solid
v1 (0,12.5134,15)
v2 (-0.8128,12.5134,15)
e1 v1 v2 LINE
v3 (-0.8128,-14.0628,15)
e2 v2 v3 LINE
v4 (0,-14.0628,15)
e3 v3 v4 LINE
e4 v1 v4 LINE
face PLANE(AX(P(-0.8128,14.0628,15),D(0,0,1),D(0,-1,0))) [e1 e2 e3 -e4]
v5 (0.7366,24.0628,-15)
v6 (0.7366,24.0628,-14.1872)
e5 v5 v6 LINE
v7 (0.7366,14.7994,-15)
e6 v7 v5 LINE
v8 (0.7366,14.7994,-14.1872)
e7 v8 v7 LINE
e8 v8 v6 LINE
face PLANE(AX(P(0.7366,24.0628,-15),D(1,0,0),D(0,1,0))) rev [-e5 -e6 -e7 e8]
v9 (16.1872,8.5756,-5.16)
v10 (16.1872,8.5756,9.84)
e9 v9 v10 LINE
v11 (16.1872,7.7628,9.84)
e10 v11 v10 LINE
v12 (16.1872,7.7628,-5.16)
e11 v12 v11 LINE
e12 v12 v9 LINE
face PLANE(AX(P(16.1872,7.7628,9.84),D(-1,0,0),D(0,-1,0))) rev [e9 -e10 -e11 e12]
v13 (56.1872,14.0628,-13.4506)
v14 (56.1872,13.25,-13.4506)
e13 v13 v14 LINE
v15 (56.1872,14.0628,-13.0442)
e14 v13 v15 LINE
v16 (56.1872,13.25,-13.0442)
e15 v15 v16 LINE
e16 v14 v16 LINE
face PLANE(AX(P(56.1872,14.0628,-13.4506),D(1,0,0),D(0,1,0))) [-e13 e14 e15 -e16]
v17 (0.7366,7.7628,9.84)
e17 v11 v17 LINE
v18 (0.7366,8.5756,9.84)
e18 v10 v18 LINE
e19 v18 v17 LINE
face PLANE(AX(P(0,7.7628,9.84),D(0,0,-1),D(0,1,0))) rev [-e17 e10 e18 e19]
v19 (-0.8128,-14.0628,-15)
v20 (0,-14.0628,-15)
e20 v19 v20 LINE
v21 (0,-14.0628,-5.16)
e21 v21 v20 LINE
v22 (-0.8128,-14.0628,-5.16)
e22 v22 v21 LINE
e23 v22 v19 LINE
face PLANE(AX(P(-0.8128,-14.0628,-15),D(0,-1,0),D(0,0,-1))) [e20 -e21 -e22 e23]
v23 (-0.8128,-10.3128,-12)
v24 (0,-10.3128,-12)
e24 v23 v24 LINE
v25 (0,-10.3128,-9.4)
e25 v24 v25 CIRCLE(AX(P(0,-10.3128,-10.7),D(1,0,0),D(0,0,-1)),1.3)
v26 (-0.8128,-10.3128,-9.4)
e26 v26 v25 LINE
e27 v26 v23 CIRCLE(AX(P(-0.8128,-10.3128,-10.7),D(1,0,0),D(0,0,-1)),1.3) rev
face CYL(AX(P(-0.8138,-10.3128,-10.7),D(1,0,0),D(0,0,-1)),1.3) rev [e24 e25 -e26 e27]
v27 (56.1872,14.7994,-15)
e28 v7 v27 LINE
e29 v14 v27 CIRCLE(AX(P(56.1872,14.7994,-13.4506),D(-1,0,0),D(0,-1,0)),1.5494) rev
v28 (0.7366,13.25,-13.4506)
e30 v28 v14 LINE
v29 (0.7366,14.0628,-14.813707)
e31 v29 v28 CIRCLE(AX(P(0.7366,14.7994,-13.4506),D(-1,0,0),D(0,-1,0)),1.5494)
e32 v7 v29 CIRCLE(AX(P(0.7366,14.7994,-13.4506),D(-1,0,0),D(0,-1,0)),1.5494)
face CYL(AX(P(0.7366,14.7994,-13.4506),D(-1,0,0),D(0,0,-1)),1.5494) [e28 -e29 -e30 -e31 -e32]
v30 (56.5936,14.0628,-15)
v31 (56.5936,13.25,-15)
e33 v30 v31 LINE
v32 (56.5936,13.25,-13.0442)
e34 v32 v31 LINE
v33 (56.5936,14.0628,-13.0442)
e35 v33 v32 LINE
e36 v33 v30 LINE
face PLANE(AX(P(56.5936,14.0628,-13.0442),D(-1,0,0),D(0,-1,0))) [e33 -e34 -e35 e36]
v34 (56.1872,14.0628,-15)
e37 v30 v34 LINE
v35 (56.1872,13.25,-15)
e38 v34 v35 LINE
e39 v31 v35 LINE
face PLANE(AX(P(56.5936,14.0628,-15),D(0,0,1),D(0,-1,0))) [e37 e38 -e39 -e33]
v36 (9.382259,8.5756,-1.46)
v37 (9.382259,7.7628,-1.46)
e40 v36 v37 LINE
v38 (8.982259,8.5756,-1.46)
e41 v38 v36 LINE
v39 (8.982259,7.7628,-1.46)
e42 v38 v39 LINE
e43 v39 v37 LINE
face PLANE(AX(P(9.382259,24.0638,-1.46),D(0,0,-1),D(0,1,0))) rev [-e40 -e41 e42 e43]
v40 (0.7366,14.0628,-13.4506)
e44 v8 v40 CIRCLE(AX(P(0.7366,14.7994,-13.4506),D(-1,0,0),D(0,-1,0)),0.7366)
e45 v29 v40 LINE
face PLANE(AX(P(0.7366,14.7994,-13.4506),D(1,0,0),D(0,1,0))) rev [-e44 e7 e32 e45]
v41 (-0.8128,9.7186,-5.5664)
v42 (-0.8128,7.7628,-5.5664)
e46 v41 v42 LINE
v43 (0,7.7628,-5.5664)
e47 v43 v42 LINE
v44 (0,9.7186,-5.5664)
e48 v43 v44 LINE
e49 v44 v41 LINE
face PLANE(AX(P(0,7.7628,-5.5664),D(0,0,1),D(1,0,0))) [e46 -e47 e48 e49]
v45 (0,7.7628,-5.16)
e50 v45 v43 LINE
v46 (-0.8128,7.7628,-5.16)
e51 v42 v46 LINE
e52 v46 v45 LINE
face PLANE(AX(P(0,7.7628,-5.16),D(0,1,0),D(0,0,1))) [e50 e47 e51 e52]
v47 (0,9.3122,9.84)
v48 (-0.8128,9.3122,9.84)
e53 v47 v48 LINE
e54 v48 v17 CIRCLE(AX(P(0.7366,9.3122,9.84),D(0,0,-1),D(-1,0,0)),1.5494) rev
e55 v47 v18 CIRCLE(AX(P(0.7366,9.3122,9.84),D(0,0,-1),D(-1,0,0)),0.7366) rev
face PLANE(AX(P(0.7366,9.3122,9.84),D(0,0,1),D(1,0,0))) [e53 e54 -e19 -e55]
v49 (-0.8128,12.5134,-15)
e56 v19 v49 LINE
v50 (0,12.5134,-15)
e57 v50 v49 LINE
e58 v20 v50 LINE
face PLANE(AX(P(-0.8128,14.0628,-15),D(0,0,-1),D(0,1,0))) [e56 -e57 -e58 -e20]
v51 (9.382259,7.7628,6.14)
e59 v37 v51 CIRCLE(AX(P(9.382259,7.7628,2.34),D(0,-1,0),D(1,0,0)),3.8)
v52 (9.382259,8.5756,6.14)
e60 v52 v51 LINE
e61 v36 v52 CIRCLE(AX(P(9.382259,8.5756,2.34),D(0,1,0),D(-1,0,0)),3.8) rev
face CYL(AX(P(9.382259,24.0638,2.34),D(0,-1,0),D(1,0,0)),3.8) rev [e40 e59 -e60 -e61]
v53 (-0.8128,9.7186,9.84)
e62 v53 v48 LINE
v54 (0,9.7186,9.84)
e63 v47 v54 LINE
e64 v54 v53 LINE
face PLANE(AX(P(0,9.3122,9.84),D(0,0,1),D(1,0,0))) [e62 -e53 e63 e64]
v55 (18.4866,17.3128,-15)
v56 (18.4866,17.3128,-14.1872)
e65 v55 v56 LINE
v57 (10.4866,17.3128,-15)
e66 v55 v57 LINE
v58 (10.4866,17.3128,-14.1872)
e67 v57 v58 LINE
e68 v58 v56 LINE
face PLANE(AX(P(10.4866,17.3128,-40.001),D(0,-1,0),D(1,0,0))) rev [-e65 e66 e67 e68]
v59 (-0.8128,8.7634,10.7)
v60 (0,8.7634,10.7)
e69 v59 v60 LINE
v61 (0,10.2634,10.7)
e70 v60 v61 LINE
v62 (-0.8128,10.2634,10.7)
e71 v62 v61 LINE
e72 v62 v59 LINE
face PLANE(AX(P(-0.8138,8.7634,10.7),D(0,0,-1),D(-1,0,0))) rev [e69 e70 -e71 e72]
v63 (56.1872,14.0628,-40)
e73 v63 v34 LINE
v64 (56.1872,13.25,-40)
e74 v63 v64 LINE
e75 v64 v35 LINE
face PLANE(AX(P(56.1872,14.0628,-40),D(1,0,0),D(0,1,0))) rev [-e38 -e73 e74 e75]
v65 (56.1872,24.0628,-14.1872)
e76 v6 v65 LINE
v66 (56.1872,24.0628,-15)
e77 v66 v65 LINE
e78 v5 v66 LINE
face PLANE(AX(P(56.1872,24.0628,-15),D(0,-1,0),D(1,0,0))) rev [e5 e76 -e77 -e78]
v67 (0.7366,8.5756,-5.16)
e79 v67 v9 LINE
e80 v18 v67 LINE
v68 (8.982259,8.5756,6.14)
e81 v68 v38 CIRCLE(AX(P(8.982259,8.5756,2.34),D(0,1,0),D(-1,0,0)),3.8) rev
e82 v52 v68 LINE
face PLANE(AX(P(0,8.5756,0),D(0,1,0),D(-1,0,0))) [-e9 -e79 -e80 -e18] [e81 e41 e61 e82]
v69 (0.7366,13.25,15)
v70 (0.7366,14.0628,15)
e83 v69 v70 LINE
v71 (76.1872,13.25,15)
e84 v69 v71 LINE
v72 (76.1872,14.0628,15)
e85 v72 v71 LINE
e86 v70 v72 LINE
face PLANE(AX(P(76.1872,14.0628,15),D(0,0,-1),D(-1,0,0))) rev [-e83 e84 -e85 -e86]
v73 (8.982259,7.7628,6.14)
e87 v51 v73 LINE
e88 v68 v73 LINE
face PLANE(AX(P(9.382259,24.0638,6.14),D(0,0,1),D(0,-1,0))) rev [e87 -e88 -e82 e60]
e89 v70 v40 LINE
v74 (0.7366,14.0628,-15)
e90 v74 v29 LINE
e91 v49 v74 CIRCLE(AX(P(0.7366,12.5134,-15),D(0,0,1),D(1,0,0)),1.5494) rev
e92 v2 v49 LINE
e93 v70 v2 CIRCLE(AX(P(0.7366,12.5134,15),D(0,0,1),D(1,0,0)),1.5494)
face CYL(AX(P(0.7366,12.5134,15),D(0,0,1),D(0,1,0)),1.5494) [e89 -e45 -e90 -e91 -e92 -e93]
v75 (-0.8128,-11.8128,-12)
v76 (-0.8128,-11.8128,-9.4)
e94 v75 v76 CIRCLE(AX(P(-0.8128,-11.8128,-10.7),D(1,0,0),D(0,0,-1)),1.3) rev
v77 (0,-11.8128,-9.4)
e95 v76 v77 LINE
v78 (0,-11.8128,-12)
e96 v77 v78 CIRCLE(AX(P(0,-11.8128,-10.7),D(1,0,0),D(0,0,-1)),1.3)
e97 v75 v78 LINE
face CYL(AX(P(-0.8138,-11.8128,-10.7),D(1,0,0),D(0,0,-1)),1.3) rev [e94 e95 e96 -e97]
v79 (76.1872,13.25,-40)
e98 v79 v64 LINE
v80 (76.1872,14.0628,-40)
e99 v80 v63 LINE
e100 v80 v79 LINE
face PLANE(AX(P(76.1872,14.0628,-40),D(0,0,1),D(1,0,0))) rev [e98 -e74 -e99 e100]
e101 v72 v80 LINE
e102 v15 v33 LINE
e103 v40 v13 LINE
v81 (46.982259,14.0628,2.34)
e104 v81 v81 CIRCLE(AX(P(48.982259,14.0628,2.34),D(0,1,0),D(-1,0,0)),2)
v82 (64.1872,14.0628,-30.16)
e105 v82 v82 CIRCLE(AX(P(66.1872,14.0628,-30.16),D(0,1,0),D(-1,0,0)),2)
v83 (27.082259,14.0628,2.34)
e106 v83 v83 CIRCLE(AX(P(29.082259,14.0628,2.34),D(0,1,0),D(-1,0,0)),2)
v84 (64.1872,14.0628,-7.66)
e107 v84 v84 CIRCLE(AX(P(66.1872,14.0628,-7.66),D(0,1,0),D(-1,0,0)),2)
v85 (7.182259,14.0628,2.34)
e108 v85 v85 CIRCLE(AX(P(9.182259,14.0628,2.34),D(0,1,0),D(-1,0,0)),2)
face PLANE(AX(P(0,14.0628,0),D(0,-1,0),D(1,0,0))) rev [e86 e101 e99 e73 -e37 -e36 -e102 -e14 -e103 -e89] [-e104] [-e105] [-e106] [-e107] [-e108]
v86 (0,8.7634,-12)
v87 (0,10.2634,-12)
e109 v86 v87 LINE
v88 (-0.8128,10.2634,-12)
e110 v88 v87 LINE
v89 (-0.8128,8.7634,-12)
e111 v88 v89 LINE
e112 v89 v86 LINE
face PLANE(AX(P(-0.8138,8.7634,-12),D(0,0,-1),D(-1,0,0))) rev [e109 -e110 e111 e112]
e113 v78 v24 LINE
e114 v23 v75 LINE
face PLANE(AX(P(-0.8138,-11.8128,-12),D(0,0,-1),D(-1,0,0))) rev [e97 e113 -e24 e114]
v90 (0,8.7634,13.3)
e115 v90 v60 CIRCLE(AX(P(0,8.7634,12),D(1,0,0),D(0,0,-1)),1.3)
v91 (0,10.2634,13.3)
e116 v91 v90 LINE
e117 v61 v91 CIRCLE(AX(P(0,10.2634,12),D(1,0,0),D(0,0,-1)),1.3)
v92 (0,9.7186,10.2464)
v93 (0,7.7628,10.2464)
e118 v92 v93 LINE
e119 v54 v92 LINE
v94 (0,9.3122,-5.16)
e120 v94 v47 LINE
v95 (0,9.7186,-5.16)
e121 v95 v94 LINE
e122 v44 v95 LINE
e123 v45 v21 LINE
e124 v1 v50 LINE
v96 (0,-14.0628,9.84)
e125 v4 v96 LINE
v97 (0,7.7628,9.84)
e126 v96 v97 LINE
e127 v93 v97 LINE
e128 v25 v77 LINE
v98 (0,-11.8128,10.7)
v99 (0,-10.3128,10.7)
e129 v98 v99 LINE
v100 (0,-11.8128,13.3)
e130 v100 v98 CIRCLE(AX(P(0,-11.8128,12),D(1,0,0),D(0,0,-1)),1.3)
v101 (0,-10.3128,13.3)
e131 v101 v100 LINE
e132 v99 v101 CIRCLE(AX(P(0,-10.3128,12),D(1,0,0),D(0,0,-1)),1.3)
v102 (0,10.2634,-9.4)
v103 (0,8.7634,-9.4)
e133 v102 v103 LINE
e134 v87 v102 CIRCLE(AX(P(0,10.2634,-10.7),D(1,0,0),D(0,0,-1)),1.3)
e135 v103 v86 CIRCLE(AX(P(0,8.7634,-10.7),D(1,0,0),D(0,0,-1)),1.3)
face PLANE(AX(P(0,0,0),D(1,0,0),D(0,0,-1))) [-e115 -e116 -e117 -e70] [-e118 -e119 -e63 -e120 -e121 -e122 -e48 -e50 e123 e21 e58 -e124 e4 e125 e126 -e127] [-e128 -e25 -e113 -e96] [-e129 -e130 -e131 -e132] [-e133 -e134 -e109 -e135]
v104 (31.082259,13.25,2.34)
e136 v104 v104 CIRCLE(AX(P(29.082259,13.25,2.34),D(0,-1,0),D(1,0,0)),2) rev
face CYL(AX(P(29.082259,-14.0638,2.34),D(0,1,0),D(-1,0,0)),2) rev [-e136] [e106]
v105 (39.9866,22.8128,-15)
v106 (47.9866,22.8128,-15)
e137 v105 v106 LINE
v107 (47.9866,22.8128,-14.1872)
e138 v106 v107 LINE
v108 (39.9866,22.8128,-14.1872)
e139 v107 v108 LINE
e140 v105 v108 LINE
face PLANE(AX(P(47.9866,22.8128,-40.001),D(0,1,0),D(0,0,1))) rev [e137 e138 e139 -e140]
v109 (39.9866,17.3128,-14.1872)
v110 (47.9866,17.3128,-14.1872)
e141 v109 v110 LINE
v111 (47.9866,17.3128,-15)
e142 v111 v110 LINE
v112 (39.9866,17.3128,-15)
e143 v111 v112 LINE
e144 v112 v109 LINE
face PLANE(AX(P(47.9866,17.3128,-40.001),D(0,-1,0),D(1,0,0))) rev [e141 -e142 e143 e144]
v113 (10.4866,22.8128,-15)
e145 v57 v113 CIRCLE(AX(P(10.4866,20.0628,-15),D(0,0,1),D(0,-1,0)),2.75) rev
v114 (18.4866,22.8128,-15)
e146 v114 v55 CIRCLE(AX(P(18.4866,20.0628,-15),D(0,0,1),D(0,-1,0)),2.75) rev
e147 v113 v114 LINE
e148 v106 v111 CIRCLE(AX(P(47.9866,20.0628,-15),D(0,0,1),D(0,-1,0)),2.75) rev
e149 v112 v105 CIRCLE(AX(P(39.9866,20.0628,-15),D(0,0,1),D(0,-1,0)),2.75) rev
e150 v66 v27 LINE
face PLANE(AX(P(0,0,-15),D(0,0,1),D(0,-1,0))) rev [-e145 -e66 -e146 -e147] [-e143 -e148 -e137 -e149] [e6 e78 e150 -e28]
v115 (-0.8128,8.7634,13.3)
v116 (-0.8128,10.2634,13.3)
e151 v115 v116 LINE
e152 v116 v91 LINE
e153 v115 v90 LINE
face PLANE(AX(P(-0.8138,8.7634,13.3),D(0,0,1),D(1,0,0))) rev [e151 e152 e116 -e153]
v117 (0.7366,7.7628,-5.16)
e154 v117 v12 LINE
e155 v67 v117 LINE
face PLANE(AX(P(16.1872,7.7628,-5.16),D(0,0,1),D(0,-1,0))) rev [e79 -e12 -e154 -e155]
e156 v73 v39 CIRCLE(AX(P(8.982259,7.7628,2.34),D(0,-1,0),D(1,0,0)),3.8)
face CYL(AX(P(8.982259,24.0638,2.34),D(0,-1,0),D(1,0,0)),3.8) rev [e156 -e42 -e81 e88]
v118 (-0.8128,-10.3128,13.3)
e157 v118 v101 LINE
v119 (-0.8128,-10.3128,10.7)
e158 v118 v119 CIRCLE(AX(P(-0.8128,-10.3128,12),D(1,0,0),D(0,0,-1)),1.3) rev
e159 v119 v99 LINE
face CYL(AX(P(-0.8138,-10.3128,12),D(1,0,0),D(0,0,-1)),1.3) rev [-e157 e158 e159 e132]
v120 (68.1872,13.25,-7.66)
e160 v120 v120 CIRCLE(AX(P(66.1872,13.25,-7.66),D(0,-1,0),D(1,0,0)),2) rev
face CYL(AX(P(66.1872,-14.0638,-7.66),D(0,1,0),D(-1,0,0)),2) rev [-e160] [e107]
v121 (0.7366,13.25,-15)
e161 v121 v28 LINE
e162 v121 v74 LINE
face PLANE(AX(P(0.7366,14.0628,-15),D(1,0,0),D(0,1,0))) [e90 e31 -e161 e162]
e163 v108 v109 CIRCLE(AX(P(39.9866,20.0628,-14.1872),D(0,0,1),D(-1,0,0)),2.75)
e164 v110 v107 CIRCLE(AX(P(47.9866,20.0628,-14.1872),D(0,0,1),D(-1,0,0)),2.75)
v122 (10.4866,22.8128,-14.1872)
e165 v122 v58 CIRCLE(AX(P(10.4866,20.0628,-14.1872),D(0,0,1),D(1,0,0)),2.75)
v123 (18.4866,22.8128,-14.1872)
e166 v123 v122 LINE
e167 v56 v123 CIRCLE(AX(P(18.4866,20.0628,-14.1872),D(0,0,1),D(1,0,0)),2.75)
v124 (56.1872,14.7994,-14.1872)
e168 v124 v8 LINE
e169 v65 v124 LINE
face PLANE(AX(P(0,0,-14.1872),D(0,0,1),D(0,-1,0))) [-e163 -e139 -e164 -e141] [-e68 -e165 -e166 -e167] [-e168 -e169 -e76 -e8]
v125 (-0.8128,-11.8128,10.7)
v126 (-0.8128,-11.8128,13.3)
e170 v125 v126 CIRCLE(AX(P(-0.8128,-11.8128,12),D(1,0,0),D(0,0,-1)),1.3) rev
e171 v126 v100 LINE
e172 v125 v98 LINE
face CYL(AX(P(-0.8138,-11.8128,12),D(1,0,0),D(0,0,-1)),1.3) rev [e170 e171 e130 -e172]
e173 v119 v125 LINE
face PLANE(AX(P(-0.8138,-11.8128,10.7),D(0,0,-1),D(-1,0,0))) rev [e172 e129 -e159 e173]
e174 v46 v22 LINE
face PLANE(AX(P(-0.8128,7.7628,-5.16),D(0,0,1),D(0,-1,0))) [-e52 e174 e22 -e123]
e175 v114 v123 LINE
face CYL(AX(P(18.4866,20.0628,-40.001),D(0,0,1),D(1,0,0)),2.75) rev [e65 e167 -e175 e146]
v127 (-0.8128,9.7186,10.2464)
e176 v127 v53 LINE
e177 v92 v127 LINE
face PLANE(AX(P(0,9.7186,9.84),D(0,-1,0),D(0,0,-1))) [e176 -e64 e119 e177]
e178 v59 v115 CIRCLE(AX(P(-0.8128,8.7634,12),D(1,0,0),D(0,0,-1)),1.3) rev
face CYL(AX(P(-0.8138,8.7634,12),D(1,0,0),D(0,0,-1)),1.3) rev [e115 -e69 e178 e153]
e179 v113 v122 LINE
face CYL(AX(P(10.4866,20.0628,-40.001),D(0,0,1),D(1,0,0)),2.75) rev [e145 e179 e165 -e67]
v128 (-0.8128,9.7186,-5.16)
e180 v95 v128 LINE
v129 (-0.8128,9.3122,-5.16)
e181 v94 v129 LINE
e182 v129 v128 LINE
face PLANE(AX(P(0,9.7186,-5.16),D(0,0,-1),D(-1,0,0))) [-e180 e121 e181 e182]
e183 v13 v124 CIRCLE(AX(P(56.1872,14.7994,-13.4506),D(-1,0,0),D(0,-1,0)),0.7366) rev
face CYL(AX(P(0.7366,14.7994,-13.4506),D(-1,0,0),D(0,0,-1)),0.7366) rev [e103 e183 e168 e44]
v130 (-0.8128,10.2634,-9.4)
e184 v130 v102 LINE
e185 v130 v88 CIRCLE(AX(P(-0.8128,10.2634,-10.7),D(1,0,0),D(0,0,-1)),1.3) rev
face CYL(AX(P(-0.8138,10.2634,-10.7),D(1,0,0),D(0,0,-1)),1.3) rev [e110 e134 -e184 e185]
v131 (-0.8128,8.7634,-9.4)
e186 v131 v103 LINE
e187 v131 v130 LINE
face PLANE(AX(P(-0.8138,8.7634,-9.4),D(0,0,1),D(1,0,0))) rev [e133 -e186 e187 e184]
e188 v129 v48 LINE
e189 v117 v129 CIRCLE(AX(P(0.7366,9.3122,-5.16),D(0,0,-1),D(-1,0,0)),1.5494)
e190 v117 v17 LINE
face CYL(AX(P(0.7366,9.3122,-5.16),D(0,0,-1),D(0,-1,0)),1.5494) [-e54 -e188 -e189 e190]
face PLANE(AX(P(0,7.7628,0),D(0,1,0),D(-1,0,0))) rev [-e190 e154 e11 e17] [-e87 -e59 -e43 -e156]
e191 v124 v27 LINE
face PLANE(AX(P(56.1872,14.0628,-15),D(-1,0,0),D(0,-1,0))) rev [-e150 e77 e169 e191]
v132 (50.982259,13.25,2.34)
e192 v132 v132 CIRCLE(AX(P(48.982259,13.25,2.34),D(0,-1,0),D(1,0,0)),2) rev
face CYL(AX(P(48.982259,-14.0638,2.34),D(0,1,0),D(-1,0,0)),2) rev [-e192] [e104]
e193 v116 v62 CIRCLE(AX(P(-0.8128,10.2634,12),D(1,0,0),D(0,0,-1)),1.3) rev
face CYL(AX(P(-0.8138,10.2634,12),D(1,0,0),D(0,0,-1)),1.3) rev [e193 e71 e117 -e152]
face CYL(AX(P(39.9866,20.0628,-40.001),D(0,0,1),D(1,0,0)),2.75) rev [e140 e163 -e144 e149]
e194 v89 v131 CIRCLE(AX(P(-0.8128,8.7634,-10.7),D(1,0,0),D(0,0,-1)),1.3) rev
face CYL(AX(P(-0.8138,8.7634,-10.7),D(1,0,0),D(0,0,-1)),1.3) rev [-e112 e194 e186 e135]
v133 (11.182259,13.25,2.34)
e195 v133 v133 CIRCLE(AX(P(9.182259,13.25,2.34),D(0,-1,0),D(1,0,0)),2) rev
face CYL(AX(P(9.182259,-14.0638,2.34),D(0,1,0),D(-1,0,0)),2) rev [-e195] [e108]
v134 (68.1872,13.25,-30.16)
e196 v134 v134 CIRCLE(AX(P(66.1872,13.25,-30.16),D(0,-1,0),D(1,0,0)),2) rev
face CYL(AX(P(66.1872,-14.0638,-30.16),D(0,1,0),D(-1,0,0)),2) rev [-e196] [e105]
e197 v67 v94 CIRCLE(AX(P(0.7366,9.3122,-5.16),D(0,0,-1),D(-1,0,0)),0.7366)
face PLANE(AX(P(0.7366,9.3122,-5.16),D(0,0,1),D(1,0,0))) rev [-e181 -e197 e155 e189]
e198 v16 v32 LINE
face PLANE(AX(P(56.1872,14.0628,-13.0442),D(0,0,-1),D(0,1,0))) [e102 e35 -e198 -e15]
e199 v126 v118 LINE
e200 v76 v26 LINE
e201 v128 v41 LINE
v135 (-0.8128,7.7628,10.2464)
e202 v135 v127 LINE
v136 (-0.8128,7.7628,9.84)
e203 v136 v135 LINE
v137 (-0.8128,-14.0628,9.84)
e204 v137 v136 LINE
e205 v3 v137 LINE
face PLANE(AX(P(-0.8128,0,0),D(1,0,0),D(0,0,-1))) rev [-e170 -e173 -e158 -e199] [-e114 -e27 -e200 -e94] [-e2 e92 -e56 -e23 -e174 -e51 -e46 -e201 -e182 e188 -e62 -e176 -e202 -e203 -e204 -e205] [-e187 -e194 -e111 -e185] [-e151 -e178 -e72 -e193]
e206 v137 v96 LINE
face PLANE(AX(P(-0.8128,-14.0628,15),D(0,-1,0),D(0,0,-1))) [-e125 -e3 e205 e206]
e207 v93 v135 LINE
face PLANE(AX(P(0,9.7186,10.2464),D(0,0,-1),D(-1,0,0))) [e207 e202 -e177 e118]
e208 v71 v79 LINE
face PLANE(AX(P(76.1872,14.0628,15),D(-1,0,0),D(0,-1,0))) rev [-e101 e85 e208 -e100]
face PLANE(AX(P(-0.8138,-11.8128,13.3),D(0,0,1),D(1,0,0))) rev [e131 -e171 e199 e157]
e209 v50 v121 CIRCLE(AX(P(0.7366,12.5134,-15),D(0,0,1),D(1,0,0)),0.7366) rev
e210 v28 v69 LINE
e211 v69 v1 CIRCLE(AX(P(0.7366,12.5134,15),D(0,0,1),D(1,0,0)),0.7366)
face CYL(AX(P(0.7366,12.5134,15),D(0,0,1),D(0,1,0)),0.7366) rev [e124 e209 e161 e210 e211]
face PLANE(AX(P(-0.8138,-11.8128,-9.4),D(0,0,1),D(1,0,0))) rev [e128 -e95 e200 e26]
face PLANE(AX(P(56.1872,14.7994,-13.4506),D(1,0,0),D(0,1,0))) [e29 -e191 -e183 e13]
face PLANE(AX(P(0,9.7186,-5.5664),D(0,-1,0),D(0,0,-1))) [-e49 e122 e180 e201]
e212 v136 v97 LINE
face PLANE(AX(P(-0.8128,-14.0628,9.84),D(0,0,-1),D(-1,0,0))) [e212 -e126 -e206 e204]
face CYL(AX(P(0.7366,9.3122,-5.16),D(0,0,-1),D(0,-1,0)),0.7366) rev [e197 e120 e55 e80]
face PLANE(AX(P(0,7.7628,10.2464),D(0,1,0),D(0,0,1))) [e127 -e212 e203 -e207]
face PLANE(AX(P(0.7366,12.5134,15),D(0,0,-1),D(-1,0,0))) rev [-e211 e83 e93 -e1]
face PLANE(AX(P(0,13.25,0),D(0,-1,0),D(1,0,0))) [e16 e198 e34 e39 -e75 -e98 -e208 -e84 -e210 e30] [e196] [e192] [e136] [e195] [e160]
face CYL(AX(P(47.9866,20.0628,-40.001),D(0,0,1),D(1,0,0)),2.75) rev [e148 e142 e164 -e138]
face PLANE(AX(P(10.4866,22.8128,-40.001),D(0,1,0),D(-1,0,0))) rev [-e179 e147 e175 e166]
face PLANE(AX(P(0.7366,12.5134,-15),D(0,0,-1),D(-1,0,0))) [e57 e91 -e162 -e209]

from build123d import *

# Parameters (mm, degrees)
BASE_FLANGE2_DEPTH           = 0.8128
EDGE_FLANGE1_STRIP_W         = 4.7244
EDGE_FLANGE1_STRIP_H         = 0.8128
EDGE_FLANGE1_STRIP_CUT_DEPTH = 30
EDGE_FLANGE1_DEPTH           = 30
EDGE_FLANGE1_FLAT_DEPTH      = 0.8128
EDGE_FLANGE3_START           = 0.7366
EDGE_FLANGE3_DEPTH           = 55.857
EDGE_FLANGE3_START_2         = 56.1872
EDGE_FLANGE3_2_DEPTH         = 0.4064
EDGE_FLANGE3_3_DEPTH         = 55.4506
CUT_EXTRUDE1_REACH           = 92.529
SKETCH21_R                   = 2
CUT_EXTRUDE2_REACH           = 87.061
EDGE_FLANGE4_START           = -5.5664
EDGE_FLANGE4_DEPTH           = 15.8128
EDGE_FLANGE4_2_DEPTH         = 0.4064
EDGE_FLANGE4_START_2         = 9.84
EDGE_FLANGE4_3_DEPTH         = 0.4064
EDGE_FLANGE4_START_3         = -5.16
EDGE_FLANGE4_4_DEPTH         = 15
CUT_EXTRUDE3_REACH           = 90.774
CUT_EXTRUDE4_REACH           = 91.35


# Read off the part's stored shape, not the designer's step: Edge-Flange3, Edge-Flange4
# Sheet-metal steps are written as plain solids
with BuildPart() as part:
    # Sketch7 → Base-Flange2 (new body)
    with BuildSketch(Plane.YZ):
        Polygon((-14.0628, 9.84), (7.7628, 9.84), (7.7628, -5.16), (-14.0628, -5.16), (-14.0628, -15), (14.0628, -15), (14.0628, 15), (-14.0628, 15), align=None)
    extrude(amount=-BASE_FLANGE2_DEPTH)

    # Edge-Flange1 strip (across the edge) → Edge-Flange1 strip cut (cut)
    with BuildSketch(Plane(origin=(0, 14.0628, -15), x_dir=(0, -1, 0), z_dir=(0, 0, 1))):
        with Locations((-0.8128, -0.4064)):
            Rectangle(EDGE_FLANGE1_STRIP_W, EDGE_FLANGE1_STRIP_H)
    extrude(amount=EDGE_FLANGE1_STRIP_CUT_DEPTH, mode=Mode.SUBTRACT)

    # Edge-Flange1 bend section (across the edge) → Edge-Flange1 (add)
    with BuildSketch(Plane(origin=(0, 14.0628, -15), x_dir=(0, -1, 0), z_dir=(0, 0, 1))):
        with BuildLine():
            Line((0, 0.7366), (0.8128, 0.7366))
            ThreePointArc((0.8128, 0.7366), (1.028545145, 0.215745145), (1.5494, 0))
            Line((1.5494, 0), (1.5494, -0.8128))
            ThreePointArc((1.5494, -0.8128), (0.453808753, -0.358991247), (0, 0.7366))
        make_face()
    extrude(amount=EDGE_FLANGE1_DEPTH)

    # Edge-Flange1 profile (on flange) → Edge-Flange1 flat (add)
    with BuildSketch(Plane.ZX.offset(14.0628)):
        Polygon((-40, 56.1872), (-15, 56.1872), (-15, 0.7366), (15, 0.7366), (15, 76.1872), (-40, 76.1872), align=None)
    extrude(amount=-EDGE_FLANGE1_FLAT_DEPTH)

    # Edge-Flange3 outline → Edge-Flange3 (cut)
    with BuildSketch(Plane.YZ.offset(EDGE_FLANGE3_START)):
        with BuildLine():
            Line((14.0628, -15), (14.0628, -14.813707039))
            ThreePointArc((14.0628, -14.813707039), (13.468624211, -14.244121367), (13.25, -13.4506))
            Line((13.25, -13.4506), (13.25, -15))
            Line((13.25, -15), (14.0628, -15))
        make_face()
    extrude(amount=EDGE_FLANGE3_DEPTH, mode=Mode.SUBTRACT)

    # Edge-Flange3 2 outline → Edge-Flange3 2 (cut)
    with BuildSketch(Plane.YZ.offset(EDGE_FLANGE3_START_2)):
        with BuildLine():
            ThreePointArc((13.25, -13.4506), (13.468624211, -14.244121367), (14.0628, -14.813707039))
            Line((14.0628, -14.813707039), (14.0628, -13.0442))
            Line((14.0628, -13.0442), (13.25, -13.0442))
            Line((13.25, -13.0442), (13.25, -13.4506))
        make_face()
    extrude(amount=EDGE_FLANGE3_2_DEPTH, mode=Mode.SUBTRACT)

    # Edge-Flange3 3 outline → Edge-Flange3 3 (add)
    with BuildSketch(Plane.YZ.offset(EDGE_FLANGE3_START)):
        with BuildLine():
            Line((14.7994, -15), (24.0628, -15))
            Line((24.0628, -15), (24.0628, -14.1872))
            Line((24.0628, -14.1872), (14.7994, -14.1872))
            ThreePointArc((14.7994, -14.1872), (14.278545145, -13.971454855), (14.0628, -13.4506))
            Line((14.0628, -13.4506), (14.0628, -14.813707039))
            ThreePointArc((14.0628, -14.813707039), (14.419503755, -14.952704924), (14.7994, -15))
        make_face()
    extrude(amount=EDGE_FLANGE3_3_DEPTH)

    # Sketch21 → Cut-Extrude1 (cut, up to next)
    with BuildSketch(Plane(origin=(0, 14.0628, 0), x_dir=(-1, 0, 0), z_dir=(0, 1, 0)), mode=Mode.PRIVATE) as cut_extrude1_sk1:
        with Locations((-66.1872, -30.16)):
            Circle(SKETCH21_R)
    cut_extrude1_tool1 = extrude(cut_extrude1_sk1.sketch, amount=-CUT_EXTRUDE1_REACH, mode=Mode.PRIVATE) & part.part
    # Sketch21 → Cut-Extrude1 (cut, up to next)
    with BuildSketch(Plane(origin=(0, 14.0628, 0), x_dir=(-1, 0, 0), z_dir=(0, 1, 0)), mode=Mode.PRIVATE) as cut_extrude1_sk2:
        with Locations((-66.1872, -7.66)):
            Circle(SKETCH21_R)
    cut_extrude1_tool2 = extrude(cut_extrude1_sk2.sketch, amount=-CUT_EXTRUDE1_REACH, mode=Mode.PRIVATE) & part.part
    # Sketch21 → Cut-Extrude1 (cut, up to next)
    with BuildSketch(Plane(origin=(0, 14.0628, 0), x_dir=(-1, 0, 0), z_dir=(0, 1, 0)), mode=Mode.PRIVATE) as cut_extrude1_sk3:
        with Locations((-48.982258849, 2.34)):
            Circle(SKETCH21_R)
    cut_extrude1_tool3 = extrude(cut_extrude1_sk3.sketch, amount=-CUT_EXTRUDE1_REACH, mode=Mode.PRIVATE) & part.part
    # Sketch21 → Cut-Extrude1 (cut, up to next)
    with BuildSketch(Plane(origin=(0, 14.0628, 0), x_dir=(-1, 0, 0), z_dir=(0, 1, 0)), mode=Mode.PRIVATE) as cut_extrude1_sk4:
        with Locations((-29.082258849, 2.34)):
            Circle(SKETCH21_R)
    cut_extrude1_tool4 = extrude(cut_extrude1_sk4.sketch, amount=-CUT_EXTRUDE1_REACH, mode=Mode.PRIVATE) & part.part
    # Sketch21 → Cut-Extrude1 (cut, up to next)
    with BuildSketch(Plane(origin=(0, 14.0628, 0), x_dir=(-1, 0, 0), z_dir=(0, 1, 0)), mode=Mode.PRIVATE) as cut_extrude1_sk5:
        with Locations((-9.182258849, 2.34)):
            Circle(SKETCH21_R)
    cut_extrude1_tool5 = extrude(cut_extrude1_sk5.sketch, amount=-CUT_EXTRUDE1_REACH, mode=Mode.PRIVATE) & part.part
    add(cut_extrude1_tool1.solids().sort_by_distance((66.1872, 14.0628, -30.16))[0], mode=Mode.SUBTRACT)
    add(cut_extrude1_tool2.solids().sort_by_distance((66.1872, 14.0628, -7.66))[0], mode=Mode.SUBTRACT)
    add(cut_extrude1_tool3.solids().sort_by_distance((48.982259, 14.0628, 2.34))[0], mode=Mode.SUBTRACT)
    add(cut_extrude1_tool4.solids().sort_by_distance((29.082259, 14.0628, 2.34))[0], mode=Mode.SUBTRACT)
    add(cut_extrude1_tool5.solids().sort_by_distance((9.182259, 14.0628, 2.34))[0], mode=Mode.SUBTRACT)

    # Sketch22 → Cut-Extrude2 (cut, up to next)
    with BuildSketch(Plane.XY.offset(-14.1872), mode=Mode.PRIVATE) as cut_extrude2_sk1:
        with BuildLine():
            Line((10.4866, 22.8128), (18.4866, 22.8128))
            ThreePointArc((18.4866, 22.8128), (21.2366, 20.0628), (18.4866, 17.3128))
            Line((18.4866, 17.3128), (10.4866, 17.3128))
            ThreePointArc((10.4866, 17.3128), (7.7366, 20.0628), (10.4866, 22.8128))
        make_face()
    cut_extrude2_tool1 = extrude(cut_extrude2_sk1.sketch, amount=-CUT_EXTRUDE2_REACH, mode=Mode.PRIVATE) & part.part
    # Sketch22 → Cut-Extrude2 (cut, up to next)
    with BuildSketch(Plane.XY.offset(-14.1872), mode=Mode.PRIVATE) as cut_extrude2_sk2:
        with BuildLine():
            Line((47.9866, 22.8128), (39.9866, 22.8128))
            ThreePointArc((39.9866, 22.8128), (37.2366, 20.0628), (39.9866, 17.3128))
            Line((39.9866, 17.3128), (47.9866, 17.3128))
            ThreePointArc((47.9866, 17.3128), (50.7366, 20.0628), (47.9866, 22.8128))
        make_face()
    cut_extrude2_tool2 = extrude(cut_extrude2_sk2.sketch, amount=-CUT_EXTRUDE2_REACH, mode=Mode.PRIVATE) & part.part
    add(cut_extrude2_tool1.solids().sort_by_distance((14.4866, 20.0628, -14.1872))[0], mode=Mode.SUBTRACT)
    add(cut_extrude2_tool2.solids().sort_by_distance((43.9866, 20.0628, -14.1872))[0], mode=Mode.SUBTRACT)

    # Edge-Flange4 outline → Edge-Flange4 (cut)
    with BuildSketch(Plane.XY.offset(EDGE_FLANGE4_START)):
        with BuildLine():
            ThreePointArc((0, 7.949092961), (-0.594175789, 8.518678633), (-0.8128, 9.3122))
            Line((-0.8128, 9.3122), (-0.8128, 7.7628))
            Line((-0.8128, 7.7628), (0, 7.7628))
            Line((0, 7.7628), (0, 7.949092961))
        make_face()
    extrude(amount=EDGE_FLANGE4_DEPTH, mode=Mode.SUBTRACT)

    # Edge-Flange4 2 outline → Edge-Flange4 2 (cut)
    with BuildSketch(Plane.XY.offset(EDGE_FLANGE4_START)):
        with BuildLine():
            Line((0, 9.7186), (-0.8128, 9.7186))
            Line((-0.8128, 9.7186), (-0.8128, 9.3122))
            ThreePointArc((-0.8128, 9.3122), (-0.594175789, 8.518678633), (0, 7.949092961))
            Line((0, 7.949092961), (0, 9.7186))
        make_face()
    extrude(amount=EDGE_FLANGE4_2_DEPTH, mode=Mode.SUBTRACT)

    # Edge-Flange4 3 outline → Edge-Flange4 3 (cut)
    with BuildSketch(Plane.XY.offset(EDGE_FLANGE4_START_2)):
        with BuildLine():
            Line((0, 9.7186), (-0.8128, 9.7186))
            Line((-0.8128, 9.7186), (-0.8128, 9.3122))
            ThreePointArc((-0.8128, 9.3122), (-0.594175789, 8.518678633), (0, 7.949092961))
            Line((0, 7.949092961), (0, 9.7186))
        make_face()
    extrude(amount=EDGE_FLANGE4_3_DEPTH, mode=Mode.SUBTRACT)

    # Edge-Flange4 4 outline → Edge-Flange4 4 (add)
    with BuildSketch(Plane.XY.offset(EDGE_FLANGE4_START_3)):
        with BuildLine():
            ThreePointArc((0.7366, 8.5756), (0.215745145, 8.791345145), (0, 9.3122))
            Line((0, 9.3122), (0, 7.949092961))
            ThreePointArc((0, 7.949092961), (0.356703755, 7.810095076), (0.7366, 7.7628))
            Line((0.7366, 7.7628), (16.1872, 7.7628))
            Line((16.1872, 7.7628), (16.1872, 8.5756))
            Line((16.1872, 8.5756), (0.7366, 8.5756))
        make_face()
    extrude(amount=EDGE_FLANGE4_4_DEPTH)

    # Sketch27 → Cut-Extrude3 (cut, up to next)
    with BuildSketch(Plane.XZ.offset(-7.7628), mode=Mode.PRIVATE) as cut_extrude3_sk1:
        with BuildLine():
            Line((9.382258849, -1.46), (8.982258849, -1.46))
            ThreePointArc((8.982258849, -1.46), (5.182258849, 2.34), (8.982258849, 6.14))
            Line((8.982258849, 6.14), (9.382258849, 6.14))
            ThreePointArc((9.382258849, 6.14), (13.182258849, 2.34), (9.382258849, -1.46))
        make_face()
    cut_extrude3_tool1 = extrude(cut_extrude3_sk1.sketch, amount=-CUT_EXTRUDE3_REACH, mode=Mode.PRIVATE) & part.part
    add(cut_extrude3_tool1.solids().sort_by_distance((9.182259, 7.7628, 2.34))[0], mode=Mode.SUBTRACT)

    # Sketch33 → Cut-Extrude4 (cut, up to next)
    with BuildSketch(Plane.YZ, mode=Mode.PRIVATE) as cut_extrude4_sk1:
        with BuildLine():
            Line((-11.8128, 13.3), (-10.3128, 13.3))
            ThreePointArc((-10.3128, 13.3), (-9.0128, 12), (-10.3128, 10.7))
            Line((-10.3128, 10.7), (-11.8128, 10.7))
            ThreePointArc((-11.8128, 10.7), (-13.1128, 12), (-11.8128, 13.3))
        make_face()
    cut_extrude4_tool1 = extrude(cut_extrude4_sk1.sketch, amount=-CUT_EXTRUDE4_REACH, mode=Mode.PRIVATE) & part.part
    # Sketch33 → Cut-Extrude4 (cut, up to next)
    with BuildSketch(Plane.YZ, mode=Mode.PRIVATE) as cut_extrude4_sk2:
        with BuildLine():
            Line((8.7634, 10.7), (10.2634, 10.7))
            ThreePointArc((10.2634, 10.7), (11.5634, 12), (10.2634, 13.3))
            Line((10.2634, 13.3), (8.7634, 13.3))
            ThreePointArc((8.7634, 13.3), (7.4634, 12), (8.7634, 10.7))
        make_face()
    cut_extrude4_tool2 = extrude(cut_extrude4_sk2.sketch, amount=-CUT_EXTRUDE4_REACH, mode=Mode.PRIVATE) & part.part
    # Sketch33 → Cut-Extrude4 (cut, up to next)
    with BuildSketch(Plane.YZ, mode=Mode.PRIVATE) as cut_extrude4_sk3:
        with BuildLine():
            Line((8.7634, -12), (10.2634, -12))
            ThreePointArc((10.2634, -12), (11.5634, -10.7), (10.2634, -9.4))
            Line((10.2634, -9.4), (8.7634, -9.4))
            ThreePointArc((8.7634, -9.4), (7.4634, -10.7), (8.7634, -12))
        make_face()
    cut_extrude4_tool3 = extrude(cut_extrude4_sk3.sketch, amount=-CUT_EXTRUDE4_REACH, mode=Mode.PRIVATE) & part.part
    # Sketch33 → Cut-Extrude4 (cut, up to next)
    with BuildSketch(Plane.YZ, mode=Mode.PRIVATE) as cut_extrude4_sk4:
        with BuildLine():
            Line((-11.8128, -12), (-10.3128, -12))
            ThreePointArc((-10.3128, -12), (-9.0128, -10.7), (-10.3128, -9.4))
            Line((-10.3128, -9.4), (-11.8128, -9.4))
            ThreePointArc((-11.8128, -9.4), (-13.1128, -10.7), (-11.8128, -12))
        make_face()
    cut_extrude4_tool4 = extrude(cut_extrude4_sk4.sketch, amount=-CUT_EXTRUDE4_REACH, mode=Mode.PRIVATE) & part.part
    add(cut_extrude4_tool1.solids().sort_by_distance((0, -11.0628, 12))[0], mode=Mode.SUBTRACT)
    add(cut_extrude4_tool2.solids().sort_by_distance((0, 9.5134, 12))[0], mode=Mode.SUBTRACT)
    add(cut_extrude4_tool3.solids().sort_by_distance((0, 9.5134, -10.7))[0], mode=Mode.SUBTRACT)
    add(cut_extrude4_tool4.solids().sort_by_distance((0, -11.0628, -10.7))[0], mode=Mode.SUBTRACT)


solid = part.part
